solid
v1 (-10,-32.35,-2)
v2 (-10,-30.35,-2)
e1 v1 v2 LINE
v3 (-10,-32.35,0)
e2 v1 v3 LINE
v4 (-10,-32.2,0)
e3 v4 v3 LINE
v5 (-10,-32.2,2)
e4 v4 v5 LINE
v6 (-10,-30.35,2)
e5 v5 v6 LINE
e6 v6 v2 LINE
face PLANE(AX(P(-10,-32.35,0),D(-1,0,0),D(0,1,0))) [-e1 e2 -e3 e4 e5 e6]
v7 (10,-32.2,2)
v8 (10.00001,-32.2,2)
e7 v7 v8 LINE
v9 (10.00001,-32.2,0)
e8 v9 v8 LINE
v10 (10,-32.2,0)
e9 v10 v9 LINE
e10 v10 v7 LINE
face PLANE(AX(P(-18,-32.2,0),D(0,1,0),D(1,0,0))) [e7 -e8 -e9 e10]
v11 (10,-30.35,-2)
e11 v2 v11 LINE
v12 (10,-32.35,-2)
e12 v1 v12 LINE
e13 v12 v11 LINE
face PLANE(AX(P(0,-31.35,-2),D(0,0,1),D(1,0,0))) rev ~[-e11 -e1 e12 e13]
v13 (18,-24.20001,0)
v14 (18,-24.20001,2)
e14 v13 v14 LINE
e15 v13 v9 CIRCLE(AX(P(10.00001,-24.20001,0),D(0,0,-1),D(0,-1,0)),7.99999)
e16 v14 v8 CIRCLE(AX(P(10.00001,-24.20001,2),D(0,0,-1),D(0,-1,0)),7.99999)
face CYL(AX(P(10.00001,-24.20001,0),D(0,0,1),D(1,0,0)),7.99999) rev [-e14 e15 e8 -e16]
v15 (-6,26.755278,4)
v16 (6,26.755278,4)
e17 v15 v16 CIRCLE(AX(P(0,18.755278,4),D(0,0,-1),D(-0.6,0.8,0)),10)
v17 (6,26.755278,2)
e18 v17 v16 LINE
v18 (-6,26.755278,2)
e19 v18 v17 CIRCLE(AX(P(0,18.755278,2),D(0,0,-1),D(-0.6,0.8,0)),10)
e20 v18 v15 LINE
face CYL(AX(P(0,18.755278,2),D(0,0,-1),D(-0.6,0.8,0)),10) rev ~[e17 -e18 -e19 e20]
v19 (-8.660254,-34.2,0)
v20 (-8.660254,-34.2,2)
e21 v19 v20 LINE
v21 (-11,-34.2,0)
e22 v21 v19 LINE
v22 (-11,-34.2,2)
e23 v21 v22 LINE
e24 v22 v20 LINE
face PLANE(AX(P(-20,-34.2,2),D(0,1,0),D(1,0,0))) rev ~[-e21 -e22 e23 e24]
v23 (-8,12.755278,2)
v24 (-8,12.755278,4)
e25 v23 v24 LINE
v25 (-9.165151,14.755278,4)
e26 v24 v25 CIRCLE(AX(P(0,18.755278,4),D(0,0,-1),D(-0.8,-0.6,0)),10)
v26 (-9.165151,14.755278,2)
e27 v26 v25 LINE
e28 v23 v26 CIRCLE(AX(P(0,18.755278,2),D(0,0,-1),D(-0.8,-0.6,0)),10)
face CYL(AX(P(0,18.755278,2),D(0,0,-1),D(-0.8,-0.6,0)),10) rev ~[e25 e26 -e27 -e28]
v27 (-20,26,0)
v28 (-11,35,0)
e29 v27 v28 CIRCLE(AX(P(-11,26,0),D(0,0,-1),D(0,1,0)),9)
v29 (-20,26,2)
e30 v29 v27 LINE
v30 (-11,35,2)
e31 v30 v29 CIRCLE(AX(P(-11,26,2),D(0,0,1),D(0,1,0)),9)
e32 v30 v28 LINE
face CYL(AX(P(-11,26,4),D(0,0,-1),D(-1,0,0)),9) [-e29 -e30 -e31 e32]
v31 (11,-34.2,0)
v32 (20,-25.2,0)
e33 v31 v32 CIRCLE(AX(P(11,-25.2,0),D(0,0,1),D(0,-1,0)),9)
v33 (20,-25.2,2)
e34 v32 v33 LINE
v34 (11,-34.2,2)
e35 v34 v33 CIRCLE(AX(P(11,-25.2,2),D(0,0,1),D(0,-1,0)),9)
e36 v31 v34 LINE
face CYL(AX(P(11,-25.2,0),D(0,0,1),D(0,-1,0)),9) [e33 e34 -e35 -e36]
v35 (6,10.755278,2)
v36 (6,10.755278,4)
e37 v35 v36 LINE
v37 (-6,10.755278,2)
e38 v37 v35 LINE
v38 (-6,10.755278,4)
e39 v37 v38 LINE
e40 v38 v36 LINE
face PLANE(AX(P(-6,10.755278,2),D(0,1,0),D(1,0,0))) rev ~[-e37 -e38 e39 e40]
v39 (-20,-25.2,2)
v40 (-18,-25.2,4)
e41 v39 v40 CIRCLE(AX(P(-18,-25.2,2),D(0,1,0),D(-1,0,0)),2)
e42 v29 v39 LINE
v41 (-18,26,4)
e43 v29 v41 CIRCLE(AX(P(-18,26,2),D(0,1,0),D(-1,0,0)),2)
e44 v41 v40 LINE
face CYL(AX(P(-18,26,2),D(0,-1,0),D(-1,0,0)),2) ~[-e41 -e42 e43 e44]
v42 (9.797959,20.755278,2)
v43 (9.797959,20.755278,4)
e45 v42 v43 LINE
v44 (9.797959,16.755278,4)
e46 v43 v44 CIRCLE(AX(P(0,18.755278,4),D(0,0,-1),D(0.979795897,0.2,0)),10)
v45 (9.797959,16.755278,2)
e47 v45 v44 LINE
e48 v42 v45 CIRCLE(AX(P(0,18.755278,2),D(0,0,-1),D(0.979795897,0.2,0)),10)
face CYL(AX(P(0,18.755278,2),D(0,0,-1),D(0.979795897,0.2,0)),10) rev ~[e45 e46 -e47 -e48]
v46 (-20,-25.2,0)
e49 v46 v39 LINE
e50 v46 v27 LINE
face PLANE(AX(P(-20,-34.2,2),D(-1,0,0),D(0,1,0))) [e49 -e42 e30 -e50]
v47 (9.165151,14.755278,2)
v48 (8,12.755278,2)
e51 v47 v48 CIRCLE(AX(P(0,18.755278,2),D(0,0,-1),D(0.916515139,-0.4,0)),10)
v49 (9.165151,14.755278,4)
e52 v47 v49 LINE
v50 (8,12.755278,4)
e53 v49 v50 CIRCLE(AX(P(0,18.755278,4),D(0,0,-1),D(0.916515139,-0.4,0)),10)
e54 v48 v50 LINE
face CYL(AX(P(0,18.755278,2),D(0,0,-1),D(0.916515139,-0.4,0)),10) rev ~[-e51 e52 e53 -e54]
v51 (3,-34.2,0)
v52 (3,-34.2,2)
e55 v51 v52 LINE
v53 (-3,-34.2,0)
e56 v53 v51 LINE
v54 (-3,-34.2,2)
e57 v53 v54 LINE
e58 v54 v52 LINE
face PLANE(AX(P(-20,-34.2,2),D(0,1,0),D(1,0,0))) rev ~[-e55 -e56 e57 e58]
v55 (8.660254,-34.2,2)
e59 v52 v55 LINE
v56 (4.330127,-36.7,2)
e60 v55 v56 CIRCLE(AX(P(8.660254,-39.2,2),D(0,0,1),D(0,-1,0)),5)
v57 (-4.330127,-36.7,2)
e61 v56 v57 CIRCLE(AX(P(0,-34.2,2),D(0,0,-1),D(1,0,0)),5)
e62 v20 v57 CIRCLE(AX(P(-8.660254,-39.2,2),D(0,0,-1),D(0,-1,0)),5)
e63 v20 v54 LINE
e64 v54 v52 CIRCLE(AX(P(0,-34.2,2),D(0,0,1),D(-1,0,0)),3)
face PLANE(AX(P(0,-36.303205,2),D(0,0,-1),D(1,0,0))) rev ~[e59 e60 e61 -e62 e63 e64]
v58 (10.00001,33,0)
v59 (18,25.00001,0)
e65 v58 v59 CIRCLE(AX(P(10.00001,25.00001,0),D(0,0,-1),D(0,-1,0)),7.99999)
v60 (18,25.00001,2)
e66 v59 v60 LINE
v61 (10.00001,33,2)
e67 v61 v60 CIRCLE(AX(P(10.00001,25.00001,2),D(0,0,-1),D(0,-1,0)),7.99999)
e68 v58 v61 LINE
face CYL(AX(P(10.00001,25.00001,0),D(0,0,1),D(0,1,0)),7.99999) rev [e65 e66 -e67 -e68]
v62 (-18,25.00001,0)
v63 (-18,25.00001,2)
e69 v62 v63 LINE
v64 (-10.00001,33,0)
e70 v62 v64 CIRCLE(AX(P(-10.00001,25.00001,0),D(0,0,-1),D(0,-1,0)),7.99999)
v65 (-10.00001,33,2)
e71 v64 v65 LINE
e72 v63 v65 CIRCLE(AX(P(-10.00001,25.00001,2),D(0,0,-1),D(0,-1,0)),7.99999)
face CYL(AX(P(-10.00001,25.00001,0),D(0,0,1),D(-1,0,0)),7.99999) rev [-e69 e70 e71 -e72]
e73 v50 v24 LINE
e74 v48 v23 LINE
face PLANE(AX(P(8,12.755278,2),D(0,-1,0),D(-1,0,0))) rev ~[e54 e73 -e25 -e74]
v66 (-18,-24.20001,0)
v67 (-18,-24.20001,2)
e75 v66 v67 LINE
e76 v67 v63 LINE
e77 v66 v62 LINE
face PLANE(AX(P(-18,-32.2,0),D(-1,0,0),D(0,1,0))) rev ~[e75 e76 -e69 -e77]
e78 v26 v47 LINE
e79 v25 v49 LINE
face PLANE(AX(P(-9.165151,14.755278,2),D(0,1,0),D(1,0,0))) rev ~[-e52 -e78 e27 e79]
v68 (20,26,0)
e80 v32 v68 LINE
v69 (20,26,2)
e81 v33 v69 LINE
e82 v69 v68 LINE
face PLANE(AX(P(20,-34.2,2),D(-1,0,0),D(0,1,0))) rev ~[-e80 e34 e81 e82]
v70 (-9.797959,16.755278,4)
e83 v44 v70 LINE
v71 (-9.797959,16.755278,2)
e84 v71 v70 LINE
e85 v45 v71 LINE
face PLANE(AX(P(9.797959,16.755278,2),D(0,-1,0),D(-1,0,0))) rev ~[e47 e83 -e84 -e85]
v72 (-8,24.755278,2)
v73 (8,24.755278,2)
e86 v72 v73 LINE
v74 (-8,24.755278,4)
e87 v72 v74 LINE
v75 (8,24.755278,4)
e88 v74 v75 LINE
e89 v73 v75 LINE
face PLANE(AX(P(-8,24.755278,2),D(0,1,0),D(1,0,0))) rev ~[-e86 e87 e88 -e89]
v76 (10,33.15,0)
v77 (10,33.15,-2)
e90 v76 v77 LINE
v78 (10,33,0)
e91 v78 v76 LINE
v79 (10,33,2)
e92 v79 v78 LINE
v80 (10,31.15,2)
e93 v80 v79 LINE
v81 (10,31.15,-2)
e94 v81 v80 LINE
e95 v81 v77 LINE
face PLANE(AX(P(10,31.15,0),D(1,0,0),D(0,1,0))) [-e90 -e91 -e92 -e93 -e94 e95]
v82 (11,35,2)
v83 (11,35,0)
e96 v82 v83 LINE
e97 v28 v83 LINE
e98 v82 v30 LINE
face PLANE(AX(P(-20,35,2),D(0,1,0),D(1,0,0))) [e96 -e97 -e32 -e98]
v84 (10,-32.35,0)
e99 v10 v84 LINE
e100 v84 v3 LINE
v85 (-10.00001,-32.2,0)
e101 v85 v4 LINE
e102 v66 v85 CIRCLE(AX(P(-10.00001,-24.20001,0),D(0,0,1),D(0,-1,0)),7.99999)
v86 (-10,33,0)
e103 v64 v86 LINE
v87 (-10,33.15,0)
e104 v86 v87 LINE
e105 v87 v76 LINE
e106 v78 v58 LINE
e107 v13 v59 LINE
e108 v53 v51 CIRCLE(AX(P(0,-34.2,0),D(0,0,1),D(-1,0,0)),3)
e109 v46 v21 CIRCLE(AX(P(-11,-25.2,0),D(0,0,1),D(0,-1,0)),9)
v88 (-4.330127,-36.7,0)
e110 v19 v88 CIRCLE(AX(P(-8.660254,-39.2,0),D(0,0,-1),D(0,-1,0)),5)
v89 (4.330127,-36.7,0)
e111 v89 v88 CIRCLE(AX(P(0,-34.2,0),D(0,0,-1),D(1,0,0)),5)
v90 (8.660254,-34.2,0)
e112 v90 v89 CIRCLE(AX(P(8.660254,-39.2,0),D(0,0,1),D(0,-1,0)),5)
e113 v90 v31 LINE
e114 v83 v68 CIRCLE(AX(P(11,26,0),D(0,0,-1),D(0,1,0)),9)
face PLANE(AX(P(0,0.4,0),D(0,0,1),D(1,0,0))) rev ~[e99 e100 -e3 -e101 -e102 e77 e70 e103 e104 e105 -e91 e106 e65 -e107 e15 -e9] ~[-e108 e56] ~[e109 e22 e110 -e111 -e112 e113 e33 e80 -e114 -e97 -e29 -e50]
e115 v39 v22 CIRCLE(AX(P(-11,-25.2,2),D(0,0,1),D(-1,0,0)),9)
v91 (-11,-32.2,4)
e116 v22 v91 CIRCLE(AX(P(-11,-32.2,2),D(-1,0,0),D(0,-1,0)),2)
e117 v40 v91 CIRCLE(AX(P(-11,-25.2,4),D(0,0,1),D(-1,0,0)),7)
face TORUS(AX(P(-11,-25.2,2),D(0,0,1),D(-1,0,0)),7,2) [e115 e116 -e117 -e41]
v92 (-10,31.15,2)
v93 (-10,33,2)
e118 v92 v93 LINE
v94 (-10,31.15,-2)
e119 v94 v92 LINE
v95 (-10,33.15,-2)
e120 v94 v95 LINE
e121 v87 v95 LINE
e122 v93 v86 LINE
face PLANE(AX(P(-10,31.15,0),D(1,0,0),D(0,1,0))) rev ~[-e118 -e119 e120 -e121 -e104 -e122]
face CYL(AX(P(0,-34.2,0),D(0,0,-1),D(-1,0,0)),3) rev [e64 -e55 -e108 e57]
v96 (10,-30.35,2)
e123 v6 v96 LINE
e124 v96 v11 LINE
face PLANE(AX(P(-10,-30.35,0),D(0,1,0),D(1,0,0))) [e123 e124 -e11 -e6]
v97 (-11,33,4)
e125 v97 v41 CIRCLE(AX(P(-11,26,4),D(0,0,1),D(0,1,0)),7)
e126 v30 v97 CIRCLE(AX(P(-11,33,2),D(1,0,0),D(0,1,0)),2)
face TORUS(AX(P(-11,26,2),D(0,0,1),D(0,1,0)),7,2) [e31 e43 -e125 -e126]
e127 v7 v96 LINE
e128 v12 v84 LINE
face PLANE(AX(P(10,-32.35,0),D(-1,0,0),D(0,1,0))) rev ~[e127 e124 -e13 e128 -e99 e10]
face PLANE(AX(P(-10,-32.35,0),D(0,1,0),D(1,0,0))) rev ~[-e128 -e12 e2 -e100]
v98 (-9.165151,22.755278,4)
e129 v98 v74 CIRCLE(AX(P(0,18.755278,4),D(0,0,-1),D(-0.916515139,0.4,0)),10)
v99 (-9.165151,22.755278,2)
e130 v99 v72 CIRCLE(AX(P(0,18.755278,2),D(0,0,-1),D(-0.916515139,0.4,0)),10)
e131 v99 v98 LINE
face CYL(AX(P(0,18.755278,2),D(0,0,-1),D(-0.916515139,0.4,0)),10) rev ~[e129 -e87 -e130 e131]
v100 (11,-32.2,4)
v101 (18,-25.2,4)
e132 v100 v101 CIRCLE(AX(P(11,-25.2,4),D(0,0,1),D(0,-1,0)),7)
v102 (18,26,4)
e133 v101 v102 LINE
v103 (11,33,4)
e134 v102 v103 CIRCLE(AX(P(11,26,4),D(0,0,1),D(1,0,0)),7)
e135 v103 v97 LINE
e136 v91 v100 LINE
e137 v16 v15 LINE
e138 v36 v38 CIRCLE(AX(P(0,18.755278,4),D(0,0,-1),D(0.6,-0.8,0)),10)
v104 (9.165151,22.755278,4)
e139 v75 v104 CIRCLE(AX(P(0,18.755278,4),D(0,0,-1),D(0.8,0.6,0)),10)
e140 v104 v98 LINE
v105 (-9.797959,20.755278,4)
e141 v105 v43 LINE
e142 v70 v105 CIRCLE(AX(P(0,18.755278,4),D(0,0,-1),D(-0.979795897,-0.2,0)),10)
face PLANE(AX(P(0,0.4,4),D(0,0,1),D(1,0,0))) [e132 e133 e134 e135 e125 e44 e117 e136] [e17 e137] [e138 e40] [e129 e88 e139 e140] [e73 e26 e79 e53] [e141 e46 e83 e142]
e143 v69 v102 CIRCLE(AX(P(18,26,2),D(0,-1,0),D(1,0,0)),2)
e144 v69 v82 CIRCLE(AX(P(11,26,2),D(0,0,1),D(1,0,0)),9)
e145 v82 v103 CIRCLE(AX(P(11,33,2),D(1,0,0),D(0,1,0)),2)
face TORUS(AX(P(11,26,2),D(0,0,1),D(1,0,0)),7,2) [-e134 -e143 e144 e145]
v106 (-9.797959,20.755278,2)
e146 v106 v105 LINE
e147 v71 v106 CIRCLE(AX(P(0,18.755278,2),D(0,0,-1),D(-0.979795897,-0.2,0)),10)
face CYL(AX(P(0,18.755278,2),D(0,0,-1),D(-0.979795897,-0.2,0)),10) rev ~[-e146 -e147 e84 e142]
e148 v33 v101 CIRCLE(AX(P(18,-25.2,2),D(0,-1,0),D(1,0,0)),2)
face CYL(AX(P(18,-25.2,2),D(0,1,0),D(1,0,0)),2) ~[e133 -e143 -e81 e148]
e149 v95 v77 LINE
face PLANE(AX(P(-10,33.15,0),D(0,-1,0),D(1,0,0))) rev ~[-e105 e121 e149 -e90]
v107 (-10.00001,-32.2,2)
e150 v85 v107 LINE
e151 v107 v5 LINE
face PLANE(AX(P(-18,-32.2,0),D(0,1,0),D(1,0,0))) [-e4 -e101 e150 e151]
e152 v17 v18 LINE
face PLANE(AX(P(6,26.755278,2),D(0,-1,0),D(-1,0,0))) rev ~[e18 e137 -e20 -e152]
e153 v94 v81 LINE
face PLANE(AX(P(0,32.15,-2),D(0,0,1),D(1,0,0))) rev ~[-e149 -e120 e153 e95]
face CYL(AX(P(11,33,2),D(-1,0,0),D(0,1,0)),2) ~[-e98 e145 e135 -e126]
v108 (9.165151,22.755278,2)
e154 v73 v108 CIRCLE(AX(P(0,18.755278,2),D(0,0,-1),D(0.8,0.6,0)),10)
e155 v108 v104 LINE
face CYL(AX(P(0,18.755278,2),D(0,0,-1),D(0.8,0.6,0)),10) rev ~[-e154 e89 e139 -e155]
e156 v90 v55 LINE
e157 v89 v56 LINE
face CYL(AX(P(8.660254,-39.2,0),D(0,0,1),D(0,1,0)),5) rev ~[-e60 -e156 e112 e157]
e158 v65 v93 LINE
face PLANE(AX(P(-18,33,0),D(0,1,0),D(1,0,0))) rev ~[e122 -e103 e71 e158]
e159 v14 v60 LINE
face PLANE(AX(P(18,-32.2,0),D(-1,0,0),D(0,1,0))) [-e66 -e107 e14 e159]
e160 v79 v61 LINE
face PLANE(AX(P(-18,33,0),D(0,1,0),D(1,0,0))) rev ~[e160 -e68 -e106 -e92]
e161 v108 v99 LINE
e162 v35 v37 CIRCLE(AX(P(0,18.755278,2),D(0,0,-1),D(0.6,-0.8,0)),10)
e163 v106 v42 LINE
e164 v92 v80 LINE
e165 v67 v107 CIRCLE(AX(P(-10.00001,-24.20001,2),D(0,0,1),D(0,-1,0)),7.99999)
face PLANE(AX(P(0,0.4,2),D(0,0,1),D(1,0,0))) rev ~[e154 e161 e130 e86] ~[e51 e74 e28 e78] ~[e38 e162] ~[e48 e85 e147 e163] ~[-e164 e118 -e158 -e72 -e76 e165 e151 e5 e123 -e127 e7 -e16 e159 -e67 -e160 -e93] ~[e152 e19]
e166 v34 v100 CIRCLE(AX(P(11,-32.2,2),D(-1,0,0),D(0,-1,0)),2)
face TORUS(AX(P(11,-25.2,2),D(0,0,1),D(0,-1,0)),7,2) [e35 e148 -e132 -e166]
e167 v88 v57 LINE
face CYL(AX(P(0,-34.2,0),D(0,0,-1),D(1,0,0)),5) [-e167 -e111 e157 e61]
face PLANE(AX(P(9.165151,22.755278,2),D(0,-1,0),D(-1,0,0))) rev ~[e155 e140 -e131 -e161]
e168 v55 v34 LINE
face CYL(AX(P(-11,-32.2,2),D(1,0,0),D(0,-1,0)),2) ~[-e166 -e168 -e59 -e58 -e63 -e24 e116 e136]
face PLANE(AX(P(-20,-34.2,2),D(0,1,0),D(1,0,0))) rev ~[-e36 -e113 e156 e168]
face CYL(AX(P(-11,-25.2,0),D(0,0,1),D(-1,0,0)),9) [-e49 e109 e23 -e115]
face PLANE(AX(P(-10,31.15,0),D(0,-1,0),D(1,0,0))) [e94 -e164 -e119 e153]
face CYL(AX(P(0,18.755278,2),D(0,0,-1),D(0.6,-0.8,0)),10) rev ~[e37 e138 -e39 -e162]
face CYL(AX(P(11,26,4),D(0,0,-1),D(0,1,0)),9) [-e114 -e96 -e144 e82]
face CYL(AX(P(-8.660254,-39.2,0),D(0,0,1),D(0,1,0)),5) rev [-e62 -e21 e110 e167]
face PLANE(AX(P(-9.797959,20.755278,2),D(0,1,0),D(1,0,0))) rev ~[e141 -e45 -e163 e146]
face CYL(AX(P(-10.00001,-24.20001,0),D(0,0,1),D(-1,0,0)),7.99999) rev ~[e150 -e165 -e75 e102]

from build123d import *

# Parameters (mm, degrees)
F0_W      = 40
F0_H      = 69.2
F0_W_2    = 36
F0_H_2    = 65.2
F1_DEPTH  = 2
F2_W      = 20
F2_H      = 2
F3_DEPTH  = 2
F4_W      = 40
F4_H      = 69.2
F5_DEPTH  = 2
F6_R      = 7.99999
F7_R      = 9
F8_R      = 2
F10_DEPTH = 2
F11_R     = 5


# Not quite as in the source:
# - a fillet or chamfer is up to 0.001 mm smaller than in the source, because OpenCascade refuses the exact size


with BuildPart() as f1:
    # F0 (on Top) → F1 (new body)
    with BuildSketch(Plane.XY):
        with Locations((0, 0.4)):
            Rectangle(F0_W, F0_H)
        with Locations((0, 0.4)):
            Rectangle(F0_W_2, F0_H_2, mode=Mode.SUBTRACT)
    extrude(amount=F1_DEPTH)

    # F2 (on Top) → F3 (join, symmetric)
    with BuildSketch(Plane.XY):
        with Locations((0, -31.35)):
            Rectangle(F2_W, F2_H)
        with Locations((0, 32.15)):
            Rectangle(F2_W, F2_H)
    extrude(amount=F3_DEPTH, both=True)

    # F4 (on face) → F5 (join)
    with BuildSketch(Plane.XY.offset(2)):
        with Locations((0, 0.4)):
            Rectangle(F4_W, F4_H)
        with BuildLine():
            ThreePointArc((6, 10.7552776188), (0, 8.7552776188), (-6, 10.7552776188))
            Line((-6, 10.7552776188), (6, 10.7552776188))
        make_face(mode=Mode.SUBTRACT)
        with BuildLine():
            ThreePointArc((-8, 12.7552776188), (-8.6406368723, 13.721452588), (-9.1651513899, 14.7552776188))
            Line((-9.1651513899, 14.7552776188), (9.1651513899, 14.7552776188))
            ThreePointArc((9.1651513899, 14.7552776188), (8.6406368723, 13.721452588), (8, 12.7552776188))
            Line((8, 12.7552776188), (-8, 12.7552776188))
        make_face(mode=Mode.SUBTRACT)
        with BuildLine():
            Line((9.7979589711, 16.7552776188), (-9.7979589711, 16.7552776188))
            ThreePointArc((-9.7979589711, 16.7552776188), (-10, 18.7552776188), (-9.7979589711, 20.7552776188))
            Line((-9.7979589711, 20.7552776188), (9.7979589711, 20.7552776188))
            ThreePointArc((9.7979589711, 20.7552776188), (10, 18.7552776188), (9.7979589711, 16.7552776188))
        make_face(mode=Mode.SUBTRACT)
        with BuildLine():
            Line((9.1651513899, 22.7552776188), (-9.1651513899, 22.7552776188))
            ThreePointArc((-9.1651513899, 22.7552776188), (-8.6406368723, 23.7891026495), (-8, 24.7552776188))
            Line((-8, 24.7552776188), (8, 24.7552776188))
            ThreePointArc((8, 24.7552776188), (8.6406368723, 23.7891026495), (9.1651513899, 22.7552776188))
        make_face(mode=Mode.SUBTRACT)
        with BuildLine():
            Line((6, 26.7552776188), (-6, 26.7552776188))
            ThreePointArc((-6, 26.7552776188), (0, 28.7552776188), (6, 26.7552776188))
        make_face(mode=Mode.SUBTRACT)
    extrude(amount=F5_DEPTH)

    # F6 (radius 8 in the source; OpenCascade refuses exactly that, so slightly less here)
    f6_edges = [f1.edges().sort_by_distance(p)[0] for p in [
        (18, 33, 1),
        (-18, 33, 1),
        (18, -32.2, 1),
        (-18, -32.2, 1),
    ]]
    fillet(f6_edges, radius=F6_R)

    # F7
    f7_edges = [f1.edges().sort_by_distance(p)[0] for p in [
        (-20, -34.2, 2),
        (-20, 35, 2),
        (20, 35, 2),
        (20, -34.2, 2),
    ]]
    fillet(f7_edges, radius=F7_R)

    # F8
    f8_edges = [f1.edges().sort_by_distance(p)[0] for p in [
        (20, 0.4, 4),
    ]]
    fillet(f8_edges, radius=F8_R)

    # F9 (on face) → F10 (join)
    with BuildSketch(Plane(origin=(0, 0, 0), x_dir=(1, 0, 0), z_dir=(0, 0, -1))):
        with BuildLine():
            Line((3, 34.2), (5, 34.2))
            ThreePointArc((5, 34.2), (0, 39.2), (-5, 34.2))
            Line((-5, 34.2), (-3, 34.2))
            ThreePointArc((-3, 34.2), (0, 37.2), (3, 34.2))
        make_face()
    extrude(amount=-F10_DEPTH)

    # F11
    f11_edges = [f1.edges().sort_by_distance(p)[0] for p in [
        (-5, -34.2, 1),
        (5, -34.2, 1),
    ]]
    fillet(f11_edges, radius=F11_R)


solid = f1.part
